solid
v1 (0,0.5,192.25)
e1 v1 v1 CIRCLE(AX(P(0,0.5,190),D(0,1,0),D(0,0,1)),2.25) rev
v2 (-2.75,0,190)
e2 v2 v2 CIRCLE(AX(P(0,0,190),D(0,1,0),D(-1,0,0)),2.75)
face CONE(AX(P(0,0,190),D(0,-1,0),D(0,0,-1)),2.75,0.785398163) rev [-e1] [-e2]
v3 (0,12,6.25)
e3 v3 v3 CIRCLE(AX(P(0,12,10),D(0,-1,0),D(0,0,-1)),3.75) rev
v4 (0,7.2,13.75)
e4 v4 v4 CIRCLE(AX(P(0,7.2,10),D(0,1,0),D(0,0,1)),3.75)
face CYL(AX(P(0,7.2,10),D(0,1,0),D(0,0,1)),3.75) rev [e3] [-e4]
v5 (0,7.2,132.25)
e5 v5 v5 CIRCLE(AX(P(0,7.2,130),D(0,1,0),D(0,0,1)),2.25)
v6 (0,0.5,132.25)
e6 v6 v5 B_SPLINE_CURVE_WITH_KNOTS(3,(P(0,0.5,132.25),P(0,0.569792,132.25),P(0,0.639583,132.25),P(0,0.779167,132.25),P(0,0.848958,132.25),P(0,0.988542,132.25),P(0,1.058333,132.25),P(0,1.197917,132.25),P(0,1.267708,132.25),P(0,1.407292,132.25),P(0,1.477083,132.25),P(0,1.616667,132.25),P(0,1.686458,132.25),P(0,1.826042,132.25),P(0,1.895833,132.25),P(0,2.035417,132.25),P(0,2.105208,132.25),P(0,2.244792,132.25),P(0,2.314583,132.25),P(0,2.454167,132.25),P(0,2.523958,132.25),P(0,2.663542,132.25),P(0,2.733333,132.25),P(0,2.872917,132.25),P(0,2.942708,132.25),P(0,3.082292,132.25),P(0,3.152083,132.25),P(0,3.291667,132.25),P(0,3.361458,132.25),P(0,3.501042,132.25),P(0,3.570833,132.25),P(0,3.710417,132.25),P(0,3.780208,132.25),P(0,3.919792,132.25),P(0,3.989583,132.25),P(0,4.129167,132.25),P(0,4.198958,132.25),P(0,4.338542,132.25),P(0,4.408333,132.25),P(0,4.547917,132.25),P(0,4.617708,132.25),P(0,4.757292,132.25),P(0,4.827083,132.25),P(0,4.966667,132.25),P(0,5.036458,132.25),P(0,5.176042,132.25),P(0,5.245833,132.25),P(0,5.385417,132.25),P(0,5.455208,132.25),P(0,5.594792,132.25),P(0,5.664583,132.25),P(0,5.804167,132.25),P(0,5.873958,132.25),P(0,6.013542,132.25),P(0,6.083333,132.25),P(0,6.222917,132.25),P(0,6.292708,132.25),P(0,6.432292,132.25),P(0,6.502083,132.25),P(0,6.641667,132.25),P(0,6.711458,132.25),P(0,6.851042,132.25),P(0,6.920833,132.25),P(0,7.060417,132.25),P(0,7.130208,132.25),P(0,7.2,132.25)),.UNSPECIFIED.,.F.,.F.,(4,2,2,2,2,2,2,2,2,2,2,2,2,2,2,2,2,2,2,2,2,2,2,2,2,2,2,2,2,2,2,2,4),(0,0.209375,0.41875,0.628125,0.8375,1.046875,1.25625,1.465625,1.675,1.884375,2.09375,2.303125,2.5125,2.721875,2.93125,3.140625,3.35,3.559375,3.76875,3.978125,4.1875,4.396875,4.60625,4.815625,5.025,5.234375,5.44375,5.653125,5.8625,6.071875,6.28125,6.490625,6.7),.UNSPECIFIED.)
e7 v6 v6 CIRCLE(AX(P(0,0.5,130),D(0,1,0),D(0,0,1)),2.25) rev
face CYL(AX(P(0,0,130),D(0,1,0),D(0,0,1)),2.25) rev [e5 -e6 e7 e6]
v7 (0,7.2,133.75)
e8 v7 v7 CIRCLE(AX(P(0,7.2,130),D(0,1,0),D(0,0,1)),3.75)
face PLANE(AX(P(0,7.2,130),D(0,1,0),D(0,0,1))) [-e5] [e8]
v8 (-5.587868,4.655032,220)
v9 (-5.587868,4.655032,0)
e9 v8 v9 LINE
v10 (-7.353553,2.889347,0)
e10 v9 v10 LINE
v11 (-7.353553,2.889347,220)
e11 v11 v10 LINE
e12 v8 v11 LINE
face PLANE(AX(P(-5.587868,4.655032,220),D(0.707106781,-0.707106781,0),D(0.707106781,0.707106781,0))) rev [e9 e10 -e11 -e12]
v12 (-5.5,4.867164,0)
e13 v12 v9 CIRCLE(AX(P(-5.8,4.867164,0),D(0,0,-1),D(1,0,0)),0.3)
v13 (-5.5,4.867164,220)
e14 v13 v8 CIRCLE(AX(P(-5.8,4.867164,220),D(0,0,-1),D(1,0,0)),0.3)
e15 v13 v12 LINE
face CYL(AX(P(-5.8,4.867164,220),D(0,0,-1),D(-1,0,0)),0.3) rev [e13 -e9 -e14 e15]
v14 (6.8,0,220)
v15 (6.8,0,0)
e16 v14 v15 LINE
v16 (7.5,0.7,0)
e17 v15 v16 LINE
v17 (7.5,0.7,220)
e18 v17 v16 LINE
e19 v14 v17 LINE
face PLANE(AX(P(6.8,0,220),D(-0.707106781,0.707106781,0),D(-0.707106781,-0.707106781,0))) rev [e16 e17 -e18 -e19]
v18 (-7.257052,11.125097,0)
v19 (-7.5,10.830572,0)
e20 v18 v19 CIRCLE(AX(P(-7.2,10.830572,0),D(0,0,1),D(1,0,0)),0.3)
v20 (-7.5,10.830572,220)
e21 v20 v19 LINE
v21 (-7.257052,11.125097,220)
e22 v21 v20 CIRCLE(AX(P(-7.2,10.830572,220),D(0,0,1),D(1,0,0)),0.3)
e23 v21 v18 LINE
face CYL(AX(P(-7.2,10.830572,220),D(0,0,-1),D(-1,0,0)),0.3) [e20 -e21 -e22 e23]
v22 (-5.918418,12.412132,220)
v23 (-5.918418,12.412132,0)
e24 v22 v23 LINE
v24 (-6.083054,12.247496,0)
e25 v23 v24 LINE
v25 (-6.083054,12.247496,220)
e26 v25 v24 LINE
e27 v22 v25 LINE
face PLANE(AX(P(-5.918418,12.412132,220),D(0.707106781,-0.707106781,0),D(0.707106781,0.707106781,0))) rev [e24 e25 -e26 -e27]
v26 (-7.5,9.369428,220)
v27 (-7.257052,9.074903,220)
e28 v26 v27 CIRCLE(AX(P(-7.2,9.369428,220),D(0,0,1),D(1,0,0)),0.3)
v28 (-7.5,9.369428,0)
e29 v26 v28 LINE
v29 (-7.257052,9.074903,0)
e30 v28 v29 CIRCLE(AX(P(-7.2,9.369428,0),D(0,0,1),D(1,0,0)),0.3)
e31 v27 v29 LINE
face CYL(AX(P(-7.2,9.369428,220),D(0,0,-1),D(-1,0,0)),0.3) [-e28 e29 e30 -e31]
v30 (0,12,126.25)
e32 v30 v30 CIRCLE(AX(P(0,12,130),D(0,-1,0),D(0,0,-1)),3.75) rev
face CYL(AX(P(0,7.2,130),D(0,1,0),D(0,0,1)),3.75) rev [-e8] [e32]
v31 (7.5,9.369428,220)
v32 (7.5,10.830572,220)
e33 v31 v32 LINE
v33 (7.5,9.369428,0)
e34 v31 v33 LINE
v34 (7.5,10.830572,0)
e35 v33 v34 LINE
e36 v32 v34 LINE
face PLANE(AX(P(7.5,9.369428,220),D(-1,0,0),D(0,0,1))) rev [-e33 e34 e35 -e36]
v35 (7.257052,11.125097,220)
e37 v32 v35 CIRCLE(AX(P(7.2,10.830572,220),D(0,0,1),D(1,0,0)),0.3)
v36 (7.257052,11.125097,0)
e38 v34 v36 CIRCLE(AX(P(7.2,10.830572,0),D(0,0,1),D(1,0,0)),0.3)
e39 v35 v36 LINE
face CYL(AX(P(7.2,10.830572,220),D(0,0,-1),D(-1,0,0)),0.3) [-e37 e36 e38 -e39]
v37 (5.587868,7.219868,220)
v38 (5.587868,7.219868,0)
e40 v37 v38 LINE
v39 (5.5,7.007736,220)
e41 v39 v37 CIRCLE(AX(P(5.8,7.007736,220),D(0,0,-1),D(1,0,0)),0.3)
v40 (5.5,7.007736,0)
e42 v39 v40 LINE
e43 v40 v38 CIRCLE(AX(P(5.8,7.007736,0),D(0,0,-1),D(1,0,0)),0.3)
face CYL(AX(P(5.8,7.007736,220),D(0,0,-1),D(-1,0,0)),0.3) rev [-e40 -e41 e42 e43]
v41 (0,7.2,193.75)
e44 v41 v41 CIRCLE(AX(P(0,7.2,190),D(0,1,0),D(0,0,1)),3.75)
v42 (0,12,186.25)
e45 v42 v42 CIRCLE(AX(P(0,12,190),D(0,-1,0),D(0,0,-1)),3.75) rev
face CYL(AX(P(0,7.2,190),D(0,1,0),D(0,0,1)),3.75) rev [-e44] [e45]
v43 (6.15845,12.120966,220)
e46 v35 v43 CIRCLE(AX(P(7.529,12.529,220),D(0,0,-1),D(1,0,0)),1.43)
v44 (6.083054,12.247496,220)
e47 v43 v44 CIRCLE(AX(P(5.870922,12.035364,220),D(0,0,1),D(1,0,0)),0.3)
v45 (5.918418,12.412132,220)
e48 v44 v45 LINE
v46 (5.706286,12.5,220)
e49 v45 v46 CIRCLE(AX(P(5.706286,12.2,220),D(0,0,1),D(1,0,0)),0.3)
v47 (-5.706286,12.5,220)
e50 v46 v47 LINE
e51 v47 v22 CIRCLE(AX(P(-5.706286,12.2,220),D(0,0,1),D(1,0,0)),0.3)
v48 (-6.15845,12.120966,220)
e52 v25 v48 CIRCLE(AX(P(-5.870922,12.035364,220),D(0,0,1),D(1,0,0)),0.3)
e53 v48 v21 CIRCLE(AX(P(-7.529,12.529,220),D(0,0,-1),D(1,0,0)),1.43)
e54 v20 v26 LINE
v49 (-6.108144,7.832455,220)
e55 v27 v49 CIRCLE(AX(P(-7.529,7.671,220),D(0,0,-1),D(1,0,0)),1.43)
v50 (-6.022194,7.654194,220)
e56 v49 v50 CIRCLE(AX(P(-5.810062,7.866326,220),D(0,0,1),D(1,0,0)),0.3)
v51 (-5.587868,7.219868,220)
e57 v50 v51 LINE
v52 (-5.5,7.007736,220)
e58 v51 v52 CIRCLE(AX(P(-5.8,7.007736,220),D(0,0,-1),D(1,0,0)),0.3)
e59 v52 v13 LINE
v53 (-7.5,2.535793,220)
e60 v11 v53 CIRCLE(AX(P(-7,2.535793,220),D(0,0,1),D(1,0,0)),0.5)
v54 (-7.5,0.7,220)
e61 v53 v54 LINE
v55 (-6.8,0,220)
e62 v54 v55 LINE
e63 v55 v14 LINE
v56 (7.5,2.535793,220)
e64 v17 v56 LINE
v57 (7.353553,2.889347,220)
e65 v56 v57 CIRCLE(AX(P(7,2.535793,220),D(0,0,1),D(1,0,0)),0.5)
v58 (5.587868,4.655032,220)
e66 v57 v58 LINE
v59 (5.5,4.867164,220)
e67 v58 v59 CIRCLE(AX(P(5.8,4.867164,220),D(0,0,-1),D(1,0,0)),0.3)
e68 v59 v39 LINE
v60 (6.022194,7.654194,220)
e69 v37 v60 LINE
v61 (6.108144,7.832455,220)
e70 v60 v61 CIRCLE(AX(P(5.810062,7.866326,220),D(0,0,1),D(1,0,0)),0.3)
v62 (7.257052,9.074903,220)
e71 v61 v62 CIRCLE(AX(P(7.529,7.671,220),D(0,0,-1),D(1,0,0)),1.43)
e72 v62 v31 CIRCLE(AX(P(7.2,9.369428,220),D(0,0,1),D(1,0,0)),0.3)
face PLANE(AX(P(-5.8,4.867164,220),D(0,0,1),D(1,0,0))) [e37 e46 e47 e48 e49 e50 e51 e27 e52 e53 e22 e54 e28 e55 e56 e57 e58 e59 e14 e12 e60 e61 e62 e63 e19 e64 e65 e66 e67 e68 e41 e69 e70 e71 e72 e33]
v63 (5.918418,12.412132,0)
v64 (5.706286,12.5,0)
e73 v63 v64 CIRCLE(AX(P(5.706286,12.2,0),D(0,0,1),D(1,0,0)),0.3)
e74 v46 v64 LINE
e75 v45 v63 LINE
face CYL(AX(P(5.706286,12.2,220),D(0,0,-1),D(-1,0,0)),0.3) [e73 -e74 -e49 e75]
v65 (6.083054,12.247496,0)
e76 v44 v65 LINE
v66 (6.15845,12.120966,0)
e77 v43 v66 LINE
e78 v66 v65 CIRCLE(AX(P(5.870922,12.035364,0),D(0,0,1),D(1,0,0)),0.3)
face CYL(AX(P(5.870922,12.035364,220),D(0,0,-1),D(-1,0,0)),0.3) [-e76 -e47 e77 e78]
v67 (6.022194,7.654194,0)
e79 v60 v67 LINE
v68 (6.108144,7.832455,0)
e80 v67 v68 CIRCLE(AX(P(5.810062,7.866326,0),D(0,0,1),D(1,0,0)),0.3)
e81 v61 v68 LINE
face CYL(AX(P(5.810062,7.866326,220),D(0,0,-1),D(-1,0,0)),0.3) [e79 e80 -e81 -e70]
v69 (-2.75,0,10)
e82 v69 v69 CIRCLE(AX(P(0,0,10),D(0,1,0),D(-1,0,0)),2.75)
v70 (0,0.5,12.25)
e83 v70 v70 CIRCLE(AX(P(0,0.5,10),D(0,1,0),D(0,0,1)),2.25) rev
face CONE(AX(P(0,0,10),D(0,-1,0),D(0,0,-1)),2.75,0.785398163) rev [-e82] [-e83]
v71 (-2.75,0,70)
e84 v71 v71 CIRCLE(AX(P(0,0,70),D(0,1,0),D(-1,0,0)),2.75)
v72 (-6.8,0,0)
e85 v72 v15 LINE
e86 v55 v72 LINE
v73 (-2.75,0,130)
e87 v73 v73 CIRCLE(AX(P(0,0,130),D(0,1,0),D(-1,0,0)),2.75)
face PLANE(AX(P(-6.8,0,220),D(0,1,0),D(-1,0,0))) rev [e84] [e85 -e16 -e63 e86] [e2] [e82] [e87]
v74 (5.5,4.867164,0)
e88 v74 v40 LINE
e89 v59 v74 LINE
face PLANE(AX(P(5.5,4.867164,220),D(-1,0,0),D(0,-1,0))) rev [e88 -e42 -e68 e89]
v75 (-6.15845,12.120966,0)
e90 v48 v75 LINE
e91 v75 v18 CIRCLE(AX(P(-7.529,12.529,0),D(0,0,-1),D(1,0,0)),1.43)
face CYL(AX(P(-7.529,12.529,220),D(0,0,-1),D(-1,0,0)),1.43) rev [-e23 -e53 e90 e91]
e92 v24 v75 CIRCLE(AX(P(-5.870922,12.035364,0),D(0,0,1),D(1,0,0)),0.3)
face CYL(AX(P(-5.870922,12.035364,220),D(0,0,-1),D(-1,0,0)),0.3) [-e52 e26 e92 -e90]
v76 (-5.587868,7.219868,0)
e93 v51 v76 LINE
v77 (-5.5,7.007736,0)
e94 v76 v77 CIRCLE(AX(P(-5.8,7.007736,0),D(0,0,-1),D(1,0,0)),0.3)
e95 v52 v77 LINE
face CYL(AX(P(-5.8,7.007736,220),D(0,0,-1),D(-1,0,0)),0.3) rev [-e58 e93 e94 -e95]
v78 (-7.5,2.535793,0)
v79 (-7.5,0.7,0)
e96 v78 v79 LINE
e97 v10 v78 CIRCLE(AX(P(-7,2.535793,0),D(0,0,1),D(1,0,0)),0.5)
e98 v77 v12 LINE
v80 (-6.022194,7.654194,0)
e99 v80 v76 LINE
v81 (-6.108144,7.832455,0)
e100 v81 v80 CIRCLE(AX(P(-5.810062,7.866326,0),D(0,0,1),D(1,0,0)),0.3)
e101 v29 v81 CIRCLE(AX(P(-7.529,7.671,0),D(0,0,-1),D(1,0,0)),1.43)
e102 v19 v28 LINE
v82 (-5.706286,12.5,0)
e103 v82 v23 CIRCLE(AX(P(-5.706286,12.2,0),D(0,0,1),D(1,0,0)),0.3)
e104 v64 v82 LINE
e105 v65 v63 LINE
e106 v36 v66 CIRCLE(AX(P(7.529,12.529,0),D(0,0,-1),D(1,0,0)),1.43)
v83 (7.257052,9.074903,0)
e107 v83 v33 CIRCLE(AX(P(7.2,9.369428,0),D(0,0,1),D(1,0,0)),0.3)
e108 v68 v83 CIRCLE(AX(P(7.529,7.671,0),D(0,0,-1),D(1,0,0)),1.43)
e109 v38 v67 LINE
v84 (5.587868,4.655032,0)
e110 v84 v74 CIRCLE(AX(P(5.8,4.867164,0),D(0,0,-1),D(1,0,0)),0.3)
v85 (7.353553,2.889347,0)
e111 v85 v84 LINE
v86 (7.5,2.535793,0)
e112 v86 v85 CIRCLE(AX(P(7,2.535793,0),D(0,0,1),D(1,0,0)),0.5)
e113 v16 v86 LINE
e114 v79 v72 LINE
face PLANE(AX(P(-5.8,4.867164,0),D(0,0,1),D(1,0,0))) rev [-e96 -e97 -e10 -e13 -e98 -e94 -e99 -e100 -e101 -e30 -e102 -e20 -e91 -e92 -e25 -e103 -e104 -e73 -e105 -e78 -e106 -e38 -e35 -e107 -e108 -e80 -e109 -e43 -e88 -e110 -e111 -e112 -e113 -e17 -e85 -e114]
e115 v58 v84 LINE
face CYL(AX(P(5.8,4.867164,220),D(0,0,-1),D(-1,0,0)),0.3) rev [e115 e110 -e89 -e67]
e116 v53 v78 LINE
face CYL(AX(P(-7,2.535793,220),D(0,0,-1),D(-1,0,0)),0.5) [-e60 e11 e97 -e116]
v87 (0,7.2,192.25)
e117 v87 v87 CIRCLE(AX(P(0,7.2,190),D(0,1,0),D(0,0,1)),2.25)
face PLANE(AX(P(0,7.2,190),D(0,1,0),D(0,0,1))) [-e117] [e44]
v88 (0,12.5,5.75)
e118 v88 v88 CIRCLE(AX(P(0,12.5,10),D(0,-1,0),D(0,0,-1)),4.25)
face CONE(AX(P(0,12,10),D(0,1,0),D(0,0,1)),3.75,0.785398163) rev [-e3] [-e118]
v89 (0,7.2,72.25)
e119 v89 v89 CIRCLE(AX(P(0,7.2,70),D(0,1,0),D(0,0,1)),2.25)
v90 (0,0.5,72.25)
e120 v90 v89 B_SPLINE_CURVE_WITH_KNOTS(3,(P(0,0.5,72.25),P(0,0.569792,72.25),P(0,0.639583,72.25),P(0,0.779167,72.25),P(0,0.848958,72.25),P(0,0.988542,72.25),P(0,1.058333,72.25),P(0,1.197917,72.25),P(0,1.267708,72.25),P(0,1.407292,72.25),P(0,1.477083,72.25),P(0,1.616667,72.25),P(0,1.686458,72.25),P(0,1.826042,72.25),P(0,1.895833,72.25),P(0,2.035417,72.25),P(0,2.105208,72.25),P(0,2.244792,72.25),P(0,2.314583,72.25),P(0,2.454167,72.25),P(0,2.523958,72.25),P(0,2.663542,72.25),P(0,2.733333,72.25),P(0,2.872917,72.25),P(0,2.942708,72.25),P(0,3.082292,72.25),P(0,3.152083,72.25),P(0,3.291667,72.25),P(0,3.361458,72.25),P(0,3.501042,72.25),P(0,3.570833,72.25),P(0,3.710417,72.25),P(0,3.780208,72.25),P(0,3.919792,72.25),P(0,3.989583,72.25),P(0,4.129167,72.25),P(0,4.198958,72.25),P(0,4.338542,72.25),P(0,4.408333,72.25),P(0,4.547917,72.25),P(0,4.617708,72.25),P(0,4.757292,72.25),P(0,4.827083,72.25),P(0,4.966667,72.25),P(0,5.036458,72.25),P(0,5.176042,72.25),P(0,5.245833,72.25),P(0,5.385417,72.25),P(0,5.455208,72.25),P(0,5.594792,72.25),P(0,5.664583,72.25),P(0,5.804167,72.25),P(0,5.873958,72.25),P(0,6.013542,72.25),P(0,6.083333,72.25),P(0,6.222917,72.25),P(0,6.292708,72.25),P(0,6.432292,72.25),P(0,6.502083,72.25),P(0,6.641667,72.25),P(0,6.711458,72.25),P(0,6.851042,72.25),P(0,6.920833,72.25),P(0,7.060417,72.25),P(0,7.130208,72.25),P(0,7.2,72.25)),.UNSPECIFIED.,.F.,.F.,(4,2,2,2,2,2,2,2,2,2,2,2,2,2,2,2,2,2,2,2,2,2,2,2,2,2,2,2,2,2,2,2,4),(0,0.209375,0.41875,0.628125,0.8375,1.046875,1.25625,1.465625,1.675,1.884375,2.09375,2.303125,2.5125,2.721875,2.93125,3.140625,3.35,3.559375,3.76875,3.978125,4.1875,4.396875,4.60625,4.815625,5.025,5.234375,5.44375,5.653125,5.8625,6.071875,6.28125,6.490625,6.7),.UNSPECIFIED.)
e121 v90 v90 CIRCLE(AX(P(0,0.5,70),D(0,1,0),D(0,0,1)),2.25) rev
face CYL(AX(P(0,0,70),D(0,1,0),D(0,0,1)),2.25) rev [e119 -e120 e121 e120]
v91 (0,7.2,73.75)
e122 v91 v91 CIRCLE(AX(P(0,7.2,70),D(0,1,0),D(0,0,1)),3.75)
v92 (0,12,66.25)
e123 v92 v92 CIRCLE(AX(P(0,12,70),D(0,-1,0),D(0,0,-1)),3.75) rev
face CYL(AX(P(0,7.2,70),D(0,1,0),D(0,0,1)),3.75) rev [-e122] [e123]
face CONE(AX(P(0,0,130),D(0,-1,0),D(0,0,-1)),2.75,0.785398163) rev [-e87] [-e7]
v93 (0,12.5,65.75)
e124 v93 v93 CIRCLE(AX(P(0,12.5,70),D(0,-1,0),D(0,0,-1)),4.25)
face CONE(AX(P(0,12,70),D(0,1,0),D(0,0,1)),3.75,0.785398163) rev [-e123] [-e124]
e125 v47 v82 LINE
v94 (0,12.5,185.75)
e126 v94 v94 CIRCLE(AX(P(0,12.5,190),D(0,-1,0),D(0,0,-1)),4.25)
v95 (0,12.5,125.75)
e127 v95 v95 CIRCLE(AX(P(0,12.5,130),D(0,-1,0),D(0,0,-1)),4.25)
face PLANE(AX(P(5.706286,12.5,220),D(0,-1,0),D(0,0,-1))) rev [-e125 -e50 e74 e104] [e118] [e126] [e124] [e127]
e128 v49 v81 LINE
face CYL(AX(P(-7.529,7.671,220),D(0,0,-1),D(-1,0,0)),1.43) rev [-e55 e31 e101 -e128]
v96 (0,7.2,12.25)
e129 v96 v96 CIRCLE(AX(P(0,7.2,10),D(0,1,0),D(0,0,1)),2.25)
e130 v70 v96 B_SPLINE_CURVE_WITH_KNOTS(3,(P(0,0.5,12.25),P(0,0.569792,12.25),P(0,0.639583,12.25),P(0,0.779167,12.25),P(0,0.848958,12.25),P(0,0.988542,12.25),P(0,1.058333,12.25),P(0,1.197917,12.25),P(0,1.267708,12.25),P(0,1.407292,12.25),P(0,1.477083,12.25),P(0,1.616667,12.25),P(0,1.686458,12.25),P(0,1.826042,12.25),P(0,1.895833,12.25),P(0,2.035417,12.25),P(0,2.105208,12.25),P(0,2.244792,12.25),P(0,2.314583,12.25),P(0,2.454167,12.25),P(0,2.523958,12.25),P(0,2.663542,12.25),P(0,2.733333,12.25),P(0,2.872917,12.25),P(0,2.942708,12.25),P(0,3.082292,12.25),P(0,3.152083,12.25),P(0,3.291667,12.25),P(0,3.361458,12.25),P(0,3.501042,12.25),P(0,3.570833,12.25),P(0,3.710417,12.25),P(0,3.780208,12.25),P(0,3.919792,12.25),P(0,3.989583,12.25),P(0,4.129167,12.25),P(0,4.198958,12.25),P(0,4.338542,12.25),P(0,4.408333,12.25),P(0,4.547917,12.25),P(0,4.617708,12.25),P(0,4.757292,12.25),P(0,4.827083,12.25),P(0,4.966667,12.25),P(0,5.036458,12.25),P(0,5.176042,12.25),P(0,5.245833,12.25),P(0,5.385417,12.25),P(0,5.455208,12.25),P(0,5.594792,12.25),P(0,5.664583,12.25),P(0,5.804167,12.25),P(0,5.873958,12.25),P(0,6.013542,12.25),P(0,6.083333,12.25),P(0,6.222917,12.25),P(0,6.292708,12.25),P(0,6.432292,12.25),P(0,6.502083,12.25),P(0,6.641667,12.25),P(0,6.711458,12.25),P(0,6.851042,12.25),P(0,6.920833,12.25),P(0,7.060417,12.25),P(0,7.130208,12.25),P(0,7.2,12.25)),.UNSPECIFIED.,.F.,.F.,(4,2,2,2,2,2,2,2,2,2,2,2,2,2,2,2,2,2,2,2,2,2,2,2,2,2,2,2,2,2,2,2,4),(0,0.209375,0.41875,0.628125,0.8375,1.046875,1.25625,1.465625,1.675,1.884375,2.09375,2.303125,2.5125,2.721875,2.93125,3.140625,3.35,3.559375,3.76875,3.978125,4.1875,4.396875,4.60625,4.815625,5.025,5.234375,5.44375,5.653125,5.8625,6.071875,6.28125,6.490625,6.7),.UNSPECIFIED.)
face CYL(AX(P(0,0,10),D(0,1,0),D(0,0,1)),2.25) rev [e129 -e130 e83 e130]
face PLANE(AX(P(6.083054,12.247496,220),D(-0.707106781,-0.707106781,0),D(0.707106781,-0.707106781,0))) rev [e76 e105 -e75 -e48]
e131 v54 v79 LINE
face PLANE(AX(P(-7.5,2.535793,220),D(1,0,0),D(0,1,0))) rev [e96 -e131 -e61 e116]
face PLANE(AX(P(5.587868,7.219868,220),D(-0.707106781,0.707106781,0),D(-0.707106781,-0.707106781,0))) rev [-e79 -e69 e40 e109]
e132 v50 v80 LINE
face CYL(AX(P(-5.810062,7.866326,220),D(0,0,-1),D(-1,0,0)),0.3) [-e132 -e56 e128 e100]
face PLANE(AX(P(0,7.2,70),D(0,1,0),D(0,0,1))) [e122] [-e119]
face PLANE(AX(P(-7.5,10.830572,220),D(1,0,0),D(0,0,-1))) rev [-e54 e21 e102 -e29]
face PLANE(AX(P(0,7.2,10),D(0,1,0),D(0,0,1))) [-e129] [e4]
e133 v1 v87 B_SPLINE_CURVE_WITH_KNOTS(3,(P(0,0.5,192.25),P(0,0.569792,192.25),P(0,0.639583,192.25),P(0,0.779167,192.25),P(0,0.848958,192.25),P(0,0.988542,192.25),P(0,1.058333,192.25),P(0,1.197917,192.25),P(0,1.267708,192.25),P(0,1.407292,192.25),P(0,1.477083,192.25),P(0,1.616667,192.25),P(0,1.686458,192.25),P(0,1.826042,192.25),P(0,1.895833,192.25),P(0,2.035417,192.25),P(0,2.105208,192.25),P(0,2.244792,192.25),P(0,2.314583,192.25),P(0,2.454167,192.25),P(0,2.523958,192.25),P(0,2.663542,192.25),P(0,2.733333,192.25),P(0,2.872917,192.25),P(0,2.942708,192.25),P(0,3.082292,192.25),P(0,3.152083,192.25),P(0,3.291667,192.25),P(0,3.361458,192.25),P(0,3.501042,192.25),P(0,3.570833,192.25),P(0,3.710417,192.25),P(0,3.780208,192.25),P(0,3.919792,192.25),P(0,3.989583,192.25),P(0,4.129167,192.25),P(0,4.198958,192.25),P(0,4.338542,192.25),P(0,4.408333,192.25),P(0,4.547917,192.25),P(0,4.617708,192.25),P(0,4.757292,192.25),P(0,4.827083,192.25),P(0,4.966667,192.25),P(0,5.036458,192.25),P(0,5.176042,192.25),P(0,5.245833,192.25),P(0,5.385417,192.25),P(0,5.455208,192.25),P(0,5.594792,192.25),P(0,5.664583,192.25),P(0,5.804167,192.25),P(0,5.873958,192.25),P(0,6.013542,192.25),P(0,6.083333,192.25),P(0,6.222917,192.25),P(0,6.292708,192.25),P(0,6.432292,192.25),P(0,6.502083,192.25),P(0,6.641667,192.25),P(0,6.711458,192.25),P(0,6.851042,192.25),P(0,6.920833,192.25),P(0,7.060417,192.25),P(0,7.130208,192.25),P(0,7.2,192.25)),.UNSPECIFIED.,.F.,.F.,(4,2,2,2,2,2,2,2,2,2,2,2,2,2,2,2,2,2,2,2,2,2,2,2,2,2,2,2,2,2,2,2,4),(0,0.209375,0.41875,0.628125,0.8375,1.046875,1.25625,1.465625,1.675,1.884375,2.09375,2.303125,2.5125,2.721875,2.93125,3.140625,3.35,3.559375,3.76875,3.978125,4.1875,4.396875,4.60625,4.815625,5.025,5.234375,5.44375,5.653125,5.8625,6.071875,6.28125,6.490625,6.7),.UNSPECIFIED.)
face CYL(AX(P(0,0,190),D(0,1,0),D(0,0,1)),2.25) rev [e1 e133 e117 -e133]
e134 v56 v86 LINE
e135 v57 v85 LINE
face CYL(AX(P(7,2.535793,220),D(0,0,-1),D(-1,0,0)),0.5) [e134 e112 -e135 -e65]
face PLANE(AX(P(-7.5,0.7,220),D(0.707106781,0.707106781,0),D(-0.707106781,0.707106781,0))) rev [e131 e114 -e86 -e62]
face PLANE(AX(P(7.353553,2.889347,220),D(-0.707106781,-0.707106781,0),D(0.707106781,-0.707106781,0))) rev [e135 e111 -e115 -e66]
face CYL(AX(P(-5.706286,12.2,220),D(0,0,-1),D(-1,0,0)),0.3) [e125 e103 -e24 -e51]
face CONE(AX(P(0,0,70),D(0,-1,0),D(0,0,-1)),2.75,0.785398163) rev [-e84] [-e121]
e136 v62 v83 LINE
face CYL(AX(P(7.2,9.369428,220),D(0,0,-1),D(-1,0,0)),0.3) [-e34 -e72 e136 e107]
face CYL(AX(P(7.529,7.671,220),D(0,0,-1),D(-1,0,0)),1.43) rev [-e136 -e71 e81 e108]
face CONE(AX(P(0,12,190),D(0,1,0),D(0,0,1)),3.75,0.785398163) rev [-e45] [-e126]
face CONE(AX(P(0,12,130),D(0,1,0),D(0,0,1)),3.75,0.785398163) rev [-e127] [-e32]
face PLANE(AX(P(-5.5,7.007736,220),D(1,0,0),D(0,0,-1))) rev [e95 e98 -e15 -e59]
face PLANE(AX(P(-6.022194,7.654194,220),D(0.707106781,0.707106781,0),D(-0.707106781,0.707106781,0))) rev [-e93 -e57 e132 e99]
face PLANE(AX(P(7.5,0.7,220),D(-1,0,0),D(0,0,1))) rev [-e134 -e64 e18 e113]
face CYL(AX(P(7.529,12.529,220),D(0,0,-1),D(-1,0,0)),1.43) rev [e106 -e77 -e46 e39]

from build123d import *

# Parameters (mm, degrees)
BOSS_EXTRUDE1_DEPTH = 220
SKETCH2_R           = 3.75
CUT_EXTRUDE1_DEPTH  = 5.3
SKETCH3_R           = 2.25
CUT_EXTRUDE2_DEPTH  = 221.245522088
CHAMFER1_SIZE       = 0.5


# Read off the part's stored shape, not the designer's step: LPattern1
with BuildPart() as part:
    # Sketch1 → Boss-Extrude1 (new body)
    with BuildSketch(Plane.XY):
        with BuildLine():
            Line((-5.587867966, 4.655032034), (-7.353553391, 2.889346609))
            ThreePointArc((-7.353553391, 2.889346609), (-7.461939766, 2.727134935), (-7.5, 2.535793219))
            Line((-7.5, 2.535793219), (-7.5, 0.7))
            Line((-7.5, 0.7), (-6.8, 0))
            Line((-6.8, 0), (6.8, 0))
            Line((6.8, 0), (7.5, 0.7))
            Line((7.5, 0.7), (7.5, 2.535793219))
            ThreePointArc((7.5, 2.535793219), (7.461939766, 2.727134935), (7.353553391, 2.889346609))
            Line((7.353553391, 2.889346609), (5.587867966, 4.655032034))
            ThreePointArc((5.587867966, 4.655032034), (5.52283614, 4.752359039), (5.5, 4.867164069))
            Line((5.5, 4.867164069), (5.5, 7.007735931))
            ThreePointArc((5.5, 7.007735931), (5.52283614, 7.122540961), (5.587867966, 7.219867966))
            Line((5.587867966, 7.219867966), (6.022194074, 7.654194074))
            ThreePointArc((6.022194074, 7.654194074), (6.08029105, 7.736033047), (6.108143767, 7.832454529))
            ThreePointArc((6.108143767, 7.832454529), (6.479087517, 8.641867539), (7.257052023, 9.074903237))
            ThreePointArc((7.257052023, 9.074903237), (7.431425589, 9.178529998), (7.5, 9.369428391))
            Line((7.5, 9.369428391), (7.5, 10.830571609))
            ThreePointArc((7.5, 10.830571609), (7.431425589, 11.021470002), (7.257052023, 11.125096763))
            ThreePointArc((7.257052023, 11.125096763), (6.568589176, 11.46951378), (6.158449701, 12.120965838))
            ThreePointArc((6.158449701, 12.120965838), (6.128637664, 12.188930096), (6.0830537, 12.2474963))
            Line((6.0830537, 12.2474963), (5.918417966, 12.412132034))
            ThreePointArc((5.918417966, 12.412132034), (5.821090961, 12.47716386), (5.706285931, 12.5))
            Line((5.706285931, 12.5), (-5.706285931, 12.5))
            ThreePointArc((-5.706285931, 12.5), (-5.821090961, 12.47716386), (-5.918417966, 12.412132034))
            Line((-5.918417966, 12.412132034), (-6.0830537, 12.2474963))
            ThreePointArc((-6.0830537, 12.2474963), (-6.128637664, 12.188930096), (-6.158449701, 12.120965838))
            ThreePointArc((-6.158449701, 12.120965838), (-6.568589176, 11.46951378), (-7.257052023, 11.125096763))
            ThreePointArc((-7.257052023, 11.125096763), (-7.431425589, 11.021470002), (-7.5, 10.830571609))
            Line((-7.5, 10.830571609), (-7.5, 9.369428391))
            ThreePointArc((-7.5, 9.369428391), (-7.431425589, 9.178529998), (-7.257052023, 9.074903237))
            ThreePointArc((-7.257052023, 9.074903237), (-6.479087517, 8.641867539), (-6.108143767, 7.832454529))
            ThreePointArc((-6.108143767, 7.832454529), (-6.08029105, 7.736033047), (-6.022194074, 7.654194074))
            Line((-6.022194074, 7.654194074), (-5.587867966, 7.219867966))
            ThreePointArc((-5.587867966, 7.219867966), (-5.52283614, 7.122540961), (-5.5, 7.007735931))
            Line((-5.5, 7.007735931), (-5.5, 4.867164069))
            ThreePointArc((-5.5, 4.867164069), (-5.52283614, 4.752359039), (-5.587867966, 4.655032034))
        make_face()
    extrude(amount=BOSS_EXTRUDE1_DEPTH)

    # Sketch2 → Cut-Extrude1 (cut)
    with BuildSketch(Plane(origin=(0, 12.5, 0), x_dir=(1, 0, 0), z_dir=(0, 1, 0))):
        with Locations(Location((0, -10, 0), (0, 0, 270))):
            Circle(SKETCH2_R)
    extrude(amount=-CUT_EXTRUDE1_DEPTH, mode=Mode.SUBTRACT)

    # Sketch3 → Cut-Extrude2 (cut, through all)
    with BuildSketch(Plane(origin=(0, 7.2, 0), x_dir=(1, 0, 0), z_dir=(0, 1, 0))):
        with Locations(Location((0, -10, 0), (0, 0, 270))):
            Circle(SKETCH3_R)
    extrude(amount=-CUT_EXTRUDE2_DEPTH, mode=Mode.SUBTRACT)

    # Chamfer1
    chamfer1_edges = [part.edges().sort_by_distance(p)[0] for p in [
        (0, 12.5, 6.25),
        (0, 0, 7.75),
    ]]
    chamfer(chamfer1_edges, length=CHAMFER1_SIZE)

    # LPattern1 outline → LPattern1 (revolve, cut)
    with BuildSketch(Plane.XY.offset(190)):
        Polygon((0, 0), (2.75, 0), (2.25, 0.5), (2.25, 7.2), (3.75, 7.2), (3.75, 12), (4.25, 12.5), (0, 12.5), align=None)
    revolve(axis=Axis((0, 0, 190), (0, 1, 0)), mode=Mode.SUBTRACT)

    # LPattern1 2 outline → LPattern1 2 (revolve, cut)
    with BuildSketch(Plane.XY.offset(130)):
        Polygon((0, 12.5), (0, 0), (2.75, 0), (2.25, 0.5), (2.25, 7.2), (3.75, 7.2), (3.75, 12), (4.25, 12.5), align=None)
    revolve(axis=Axis((0, 0, 130), (0, 1, 0)), mode=Mode.SUBTRACT)

    # LPattern1 3 outline → LPattern1 3 (revolve, cut)
    with BuildSketch(Plane.XY.offset(70)):
        Polygon((0, 12.5), (0, 0), (2.75, 0), (2.25, 0.5), (2.25, 7.2), (3.75, 7.2), (3.75, 12), (4.25, 12.5), align=None)
    revolve(axis=Axis((0, 0, 70), (0, 1, 0)), mode=Mode.SUBTRACT)


solid = part.part
